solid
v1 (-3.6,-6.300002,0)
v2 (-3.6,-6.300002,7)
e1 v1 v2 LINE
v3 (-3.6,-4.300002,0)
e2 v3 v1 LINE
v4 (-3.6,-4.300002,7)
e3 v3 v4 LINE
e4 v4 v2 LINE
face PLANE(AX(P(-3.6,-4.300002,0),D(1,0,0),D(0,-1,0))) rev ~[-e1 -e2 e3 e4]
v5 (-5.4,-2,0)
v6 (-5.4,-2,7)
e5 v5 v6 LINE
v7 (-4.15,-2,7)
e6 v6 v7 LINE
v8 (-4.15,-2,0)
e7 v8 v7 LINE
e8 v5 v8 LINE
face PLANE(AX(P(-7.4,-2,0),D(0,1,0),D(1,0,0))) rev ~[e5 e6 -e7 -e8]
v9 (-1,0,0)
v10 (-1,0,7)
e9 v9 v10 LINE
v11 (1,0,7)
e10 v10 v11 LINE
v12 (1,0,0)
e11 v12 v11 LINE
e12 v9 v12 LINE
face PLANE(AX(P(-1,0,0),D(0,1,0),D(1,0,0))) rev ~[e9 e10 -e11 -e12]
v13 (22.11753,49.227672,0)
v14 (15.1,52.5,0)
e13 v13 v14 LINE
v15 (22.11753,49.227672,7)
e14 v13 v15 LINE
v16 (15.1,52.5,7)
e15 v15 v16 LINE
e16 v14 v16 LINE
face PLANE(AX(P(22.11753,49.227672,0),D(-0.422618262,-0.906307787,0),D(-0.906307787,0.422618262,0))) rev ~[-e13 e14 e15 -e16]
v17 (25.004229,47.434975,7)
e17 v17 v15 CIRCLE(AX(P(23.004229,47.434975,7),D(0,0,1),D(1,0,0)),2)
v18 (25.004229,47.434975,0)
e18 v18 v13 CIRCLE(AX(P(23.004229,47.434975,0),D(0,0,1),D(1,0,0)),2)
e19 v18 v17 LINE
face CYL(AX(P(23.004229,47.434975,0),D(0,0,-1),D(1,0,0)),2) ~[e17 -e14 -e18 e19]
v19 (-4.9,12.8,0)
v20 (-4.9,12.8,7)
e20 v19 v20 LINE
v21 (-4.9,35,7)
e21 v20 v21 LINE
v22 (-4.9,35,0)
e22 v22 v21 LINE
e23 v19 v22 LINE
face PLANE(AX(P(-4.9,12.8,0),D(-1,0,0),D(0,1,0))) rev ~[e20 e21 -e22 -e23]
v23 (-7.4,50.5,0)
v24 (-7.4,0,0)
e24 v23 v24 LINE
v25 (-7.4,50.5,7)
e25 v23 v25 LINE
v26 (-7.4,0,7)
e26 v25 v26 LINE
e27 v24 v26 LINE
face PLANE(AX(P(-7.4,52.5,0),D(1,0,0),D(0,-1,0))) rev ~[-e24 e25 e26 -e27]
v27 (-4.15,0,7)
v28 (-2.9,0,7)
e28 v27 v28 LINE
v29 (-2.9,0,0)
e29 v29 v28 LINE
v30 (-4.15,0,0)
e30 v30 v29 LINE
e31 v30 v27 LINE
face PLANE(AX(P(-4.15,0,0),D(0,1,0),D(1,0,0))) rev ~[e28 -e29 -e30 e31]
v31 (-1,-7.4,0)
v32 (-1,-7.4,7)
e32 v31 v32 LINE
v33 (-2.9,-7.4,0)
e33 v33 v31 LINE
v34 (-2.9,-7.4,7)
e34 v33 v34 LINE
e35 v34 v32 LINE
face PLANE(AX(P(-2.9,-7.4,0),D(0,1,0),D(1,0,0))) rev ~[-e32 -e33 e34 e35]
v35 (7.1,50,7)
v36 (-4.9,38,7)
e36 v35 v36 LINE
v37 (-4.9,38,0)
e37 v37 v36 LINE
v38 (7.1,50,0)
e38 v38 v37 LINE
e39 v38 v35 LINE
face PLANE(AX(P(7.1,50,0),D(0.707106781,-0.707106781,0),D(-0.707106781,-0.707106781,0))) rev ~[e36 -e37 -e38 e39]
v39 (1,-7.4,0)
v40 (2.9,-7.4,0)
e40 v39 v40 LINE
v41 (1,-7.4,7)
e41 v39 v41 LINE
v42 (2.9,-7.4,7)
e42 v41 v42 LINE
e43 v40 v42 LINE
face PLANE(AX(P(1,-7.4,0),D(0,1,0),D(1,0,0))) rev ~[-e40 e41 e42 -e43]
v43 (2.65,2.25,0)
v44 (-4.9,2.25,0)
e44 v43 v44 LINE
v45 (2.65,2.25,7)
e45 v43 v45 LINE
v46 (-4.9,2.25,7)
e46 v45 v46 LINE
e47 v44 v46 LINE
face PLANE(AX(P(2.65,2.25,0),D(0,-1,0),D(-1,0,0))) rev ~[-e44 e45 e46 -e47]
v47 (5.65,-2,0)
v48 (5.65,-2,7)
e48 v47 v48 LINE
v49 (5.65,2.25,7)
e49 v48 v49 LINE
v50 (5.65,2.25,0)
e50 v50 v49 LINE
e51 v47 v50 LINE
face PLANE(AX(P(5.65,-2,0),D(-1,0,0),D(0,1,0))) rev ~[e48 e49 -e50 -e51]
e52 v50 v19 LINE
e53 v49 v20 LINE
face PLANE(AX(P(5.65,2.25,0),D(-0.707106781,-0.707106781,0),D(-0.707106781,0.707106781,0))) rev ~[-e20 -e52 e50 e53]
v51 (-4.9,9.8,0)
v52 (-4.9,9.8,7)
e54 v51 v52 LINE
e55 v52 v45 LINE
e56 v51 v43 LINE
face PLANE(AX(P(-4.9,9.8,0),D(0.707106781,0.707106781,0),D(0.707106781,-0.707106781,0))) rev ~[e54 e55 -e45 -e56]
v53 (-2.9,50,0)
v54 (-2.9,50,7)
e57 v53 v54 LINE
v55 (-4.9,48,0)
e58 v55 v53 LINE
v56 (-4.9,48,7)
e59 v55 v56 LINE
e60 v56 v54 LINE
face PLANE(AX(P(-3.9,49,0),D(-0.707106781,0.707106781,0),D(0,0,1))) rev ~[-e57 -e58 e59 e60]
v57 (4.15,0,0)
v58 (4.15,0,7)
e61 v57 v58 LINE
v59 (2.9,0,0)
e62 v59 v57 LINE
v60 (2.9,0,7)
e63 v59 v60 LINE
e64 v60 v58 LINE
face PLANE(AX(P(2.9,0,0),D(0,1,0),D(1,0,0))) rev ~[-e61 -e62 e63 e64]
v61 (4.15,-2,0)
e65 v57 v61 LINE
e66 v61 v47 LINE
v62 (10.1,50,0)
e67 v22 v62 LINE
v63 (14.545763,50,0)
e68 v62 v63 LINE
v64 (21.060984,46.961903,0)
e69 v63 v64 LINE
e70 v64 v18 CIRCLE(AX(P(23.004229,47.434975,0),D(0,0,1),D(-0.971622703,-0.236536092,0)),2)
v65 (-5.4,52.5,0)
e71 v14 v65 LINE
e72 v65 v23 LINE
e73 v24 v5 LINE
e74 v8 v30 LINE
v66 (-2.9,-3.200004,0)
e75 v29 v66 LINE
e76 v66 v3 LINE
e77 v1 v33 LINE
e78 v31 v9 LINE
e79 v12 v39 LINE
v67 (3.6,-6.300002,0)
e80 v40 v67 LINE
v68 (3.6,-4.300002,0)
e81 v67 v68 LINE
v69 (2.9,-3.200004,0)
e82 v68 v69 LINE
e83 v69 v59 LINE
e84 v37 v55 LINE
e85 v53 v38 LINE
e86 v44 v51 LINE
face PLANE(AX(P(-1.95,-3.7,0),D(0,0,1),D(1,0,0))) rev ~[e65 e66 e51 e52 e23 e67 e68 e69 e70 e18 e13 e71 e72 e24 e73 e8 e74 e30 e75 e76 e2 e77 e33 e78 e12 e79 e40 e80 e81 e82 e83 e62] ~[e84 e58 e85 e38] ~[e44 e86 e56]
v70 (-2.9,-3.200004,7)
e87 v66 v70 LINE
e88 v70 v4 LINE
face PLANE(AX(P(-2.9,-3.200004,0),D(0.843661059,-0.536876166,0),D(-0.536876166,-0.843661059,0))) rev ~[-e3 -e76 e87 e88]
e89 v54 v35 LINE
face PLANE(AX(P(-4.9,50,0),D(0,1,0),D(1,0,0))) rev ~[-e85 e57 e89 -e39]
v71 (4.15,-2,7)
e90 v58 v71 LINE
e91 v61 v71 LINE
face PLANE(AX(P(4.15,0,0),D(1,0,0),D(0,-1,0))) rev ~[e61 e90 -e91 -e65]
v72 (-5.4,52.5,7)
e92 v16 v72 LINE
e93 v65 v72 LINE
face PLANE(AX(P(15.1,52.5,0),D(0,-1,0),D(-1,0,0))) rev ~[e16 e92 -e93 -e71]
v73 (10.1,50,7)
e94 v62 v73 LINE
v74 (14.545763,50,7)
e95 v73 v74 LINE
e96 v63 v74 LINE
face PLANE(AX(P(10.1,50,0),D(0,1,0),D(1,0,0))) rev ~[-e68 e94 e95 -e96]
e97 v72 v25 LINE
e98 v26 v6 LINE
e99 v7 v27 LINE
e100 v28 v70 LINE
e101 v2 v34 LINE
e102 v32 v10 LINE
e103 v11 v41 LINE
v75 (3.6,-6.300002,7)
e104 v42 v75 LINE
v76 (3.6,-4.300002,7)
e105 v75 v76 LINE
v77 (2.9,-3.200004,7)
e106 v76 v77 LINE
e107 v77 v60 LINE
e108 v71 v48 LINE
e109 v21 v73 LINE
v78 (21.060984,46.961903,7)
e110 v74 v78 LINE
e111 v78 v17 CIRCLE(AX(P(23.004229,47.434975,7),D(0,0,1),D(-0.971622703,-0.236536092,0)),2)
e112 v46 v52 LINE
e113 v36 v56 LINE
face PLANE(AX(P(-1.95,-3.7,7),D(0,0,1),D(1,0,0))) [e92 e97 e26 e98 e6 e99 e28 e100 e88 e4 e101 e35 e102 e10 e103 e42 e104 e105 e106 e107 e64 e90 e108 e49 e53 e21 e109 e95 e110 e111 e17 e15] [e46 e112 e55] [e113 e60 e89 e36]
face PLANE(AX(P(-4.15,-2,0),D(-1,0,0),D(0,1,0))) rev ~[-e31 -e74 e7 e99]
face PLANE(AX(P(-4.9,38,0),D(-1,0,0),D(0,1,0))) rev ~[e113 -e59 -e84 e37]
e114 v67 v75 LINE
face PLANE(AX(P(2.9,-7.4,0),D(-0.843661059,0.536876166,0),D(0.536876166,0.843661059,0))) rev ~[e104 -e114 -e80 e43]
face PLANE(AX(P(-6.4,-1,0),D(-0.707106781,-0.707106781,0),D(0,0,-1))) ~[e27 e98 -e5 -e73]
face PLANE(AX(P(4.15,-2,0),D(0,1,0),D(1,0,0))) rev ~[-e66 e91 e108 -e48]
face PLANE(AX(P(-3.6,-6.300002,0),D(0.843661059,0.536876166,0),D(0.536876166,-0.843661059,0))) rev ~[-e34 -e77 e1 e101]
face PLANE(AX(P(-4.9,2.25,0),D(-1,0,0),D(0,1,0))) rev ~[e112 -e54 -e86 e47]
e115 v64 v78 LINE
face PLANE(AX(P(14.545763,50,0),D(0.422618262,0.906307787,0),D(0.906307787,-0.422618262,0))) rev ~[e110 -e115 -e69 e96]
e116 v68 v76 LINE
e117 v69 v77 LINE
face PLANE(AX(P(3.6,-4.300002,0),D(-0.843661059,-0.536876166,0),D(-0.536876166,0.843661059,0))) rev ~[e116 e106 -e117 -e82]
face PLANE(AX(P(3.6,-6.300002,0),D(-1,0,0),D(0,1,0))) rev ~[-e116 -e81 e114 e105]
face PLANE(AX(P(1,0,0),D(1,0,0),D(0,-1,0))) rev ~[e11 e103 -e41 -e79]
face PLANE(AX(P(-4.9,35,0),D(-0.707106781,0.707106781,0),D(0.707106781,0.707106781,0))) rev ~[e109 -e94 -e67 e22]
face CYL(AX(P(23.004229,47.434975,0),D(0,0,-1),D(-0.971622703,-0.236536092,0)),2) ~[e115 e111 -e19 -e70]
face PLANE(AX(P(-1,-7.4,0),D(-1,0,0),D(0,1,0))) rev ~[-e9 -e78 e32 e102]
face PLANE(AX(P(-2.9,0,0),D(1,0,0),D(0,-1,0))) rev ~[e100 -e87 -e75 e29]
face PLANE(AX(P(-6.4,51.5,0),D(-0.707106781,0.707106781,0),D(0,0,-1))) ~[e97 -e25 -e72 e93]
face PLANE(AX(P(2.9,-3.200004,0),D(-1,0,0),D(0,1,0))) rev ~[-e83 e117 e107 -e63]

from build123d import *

# Parameters (mm, degrees)
F1_DEPTH = 7
F2_SIZE  = 2


with BuildPart() as f1:
    # F0 (on Top) → F1 (new body)
    with BuildSketch(Plane.XY):
        Polygon((-1, -7.4), (-1, 0), (-2.9, 0), (-2.9, -3.2000038773), (-2.9, -7.4), align=None)
        with BuildLine():
            Line((-2.9, 0), (-1, 0))
            Line((-1, 0), (1, 0))
            Line((1, 0), (2.9, 0))
            Line((2.9, 0), (4.15, 0))
            Line((4.15, 0), (4.15, -2))
            Line((4.15, -2), (5.65, -2))
            Line((5.65, -2), (5.65, 2.25))
            Line((5.65, 2.25), (-4.9, 12.8))
            Line((-4.9, 12.8), (-4.9, 35))
            Line((-4.9, 35), (-4.9, 38))
            Line((-4.9, 38), (-4.9, 50))
            Line((-4.9, 50), (7.1, 50))
            Line((7.1, 50), (10.1, 50))
            Line((10.1, 50), (14.5457633434, 50))
            Line((14.5457633434, 50), (21.060983901, 46.9619027594))
            ThreePointArc((21.060983901, 46.9619027594), (21.1916137331, 48.280211467), (22.1175295553, 49.227672227))
            Line((22.1175295553, 49.227672227), (15.1, 52.5))
            Line((15.1, 52.5), (-7.4, 52.5))
            Line((-7.4, 52.5), (-7.4, -2))
            Line((-7.4, -2), (-4.15, -2))
            Line((-4.15, -2), (-4.15, 0))
            Line((-4.15, 0), (-2.9, 0))
        make_face()
        Polygon((-4.9, 9.8), (2.65, 2.25), (-4.9, 2.25), align=None, mode=Mode.SUBTRACT)
        Polygon((2.9, 0), (1, 0), (1, -7.4), (2.9, -7.4), (2.9, -3.2000038773), align=None)
        Polygon((-2.9, -7.4), (-2.9, -3.2000038773), (-3.6, -4.3000019386), (-3.6, -6.3000019386), align=None)
        Polygon((3.6, -4.3000019386), (2.9, -3.2000038773), (2.9, -7.4), (3.6, -6.3000019386), align=None)
        with BuildLine():
            ThreePointArc((25.0042293071, 47.4349749436), (24.0593597485, 49.1340040051), (22.1175295553, 49.227672227))
            Line((22.1175295553, 49.227672227), (23.5325021343, 48.5678596774))
            Line((23.5325021343, 48.5678596774), (22.47595648, 46.3020902098))
            Line((22.47595648, 46.3020902098), (21.060983901, 46.9619027594))
            ThreePointArc((21.060983901, 46.9619027594), (23.2424615338, 45.4492142817), (25.0042293071, 47.4349749436))
        make_face()
        with BuildLine():
            Line((23.5325021343, 48.5678596774), (22.1175295553, 49.227672227))
            ThreePointArc((22.1175295553, 49.227672227), (21.1916137331, 48.280211467), (21.060983901, 46.9619027594))
            Line((21.060983901, 46.9619027594), (22.47595648, 46.3020902098))
            Line((22.47595648, 46.3020902098), (23.5325021343, 48.5678596774))
        make_face()
        Polygon((-4.9, 38), (-4.9, 35), (10.1, 50), (7.1, 50), align=None)
    extrude(amount=F1_DEPTH)

    # F2
    f2_edges = [f1.edges().sort_by_distance(p)[0] for p in [
        (-4.9, 50, 3.5),
        (-7.4, 52.5, 3.5),
        (-7.4, -2, 3.5),
    ]]
    chamfer(f2_edges, length=F2_SIZE)


solid = f1.part
